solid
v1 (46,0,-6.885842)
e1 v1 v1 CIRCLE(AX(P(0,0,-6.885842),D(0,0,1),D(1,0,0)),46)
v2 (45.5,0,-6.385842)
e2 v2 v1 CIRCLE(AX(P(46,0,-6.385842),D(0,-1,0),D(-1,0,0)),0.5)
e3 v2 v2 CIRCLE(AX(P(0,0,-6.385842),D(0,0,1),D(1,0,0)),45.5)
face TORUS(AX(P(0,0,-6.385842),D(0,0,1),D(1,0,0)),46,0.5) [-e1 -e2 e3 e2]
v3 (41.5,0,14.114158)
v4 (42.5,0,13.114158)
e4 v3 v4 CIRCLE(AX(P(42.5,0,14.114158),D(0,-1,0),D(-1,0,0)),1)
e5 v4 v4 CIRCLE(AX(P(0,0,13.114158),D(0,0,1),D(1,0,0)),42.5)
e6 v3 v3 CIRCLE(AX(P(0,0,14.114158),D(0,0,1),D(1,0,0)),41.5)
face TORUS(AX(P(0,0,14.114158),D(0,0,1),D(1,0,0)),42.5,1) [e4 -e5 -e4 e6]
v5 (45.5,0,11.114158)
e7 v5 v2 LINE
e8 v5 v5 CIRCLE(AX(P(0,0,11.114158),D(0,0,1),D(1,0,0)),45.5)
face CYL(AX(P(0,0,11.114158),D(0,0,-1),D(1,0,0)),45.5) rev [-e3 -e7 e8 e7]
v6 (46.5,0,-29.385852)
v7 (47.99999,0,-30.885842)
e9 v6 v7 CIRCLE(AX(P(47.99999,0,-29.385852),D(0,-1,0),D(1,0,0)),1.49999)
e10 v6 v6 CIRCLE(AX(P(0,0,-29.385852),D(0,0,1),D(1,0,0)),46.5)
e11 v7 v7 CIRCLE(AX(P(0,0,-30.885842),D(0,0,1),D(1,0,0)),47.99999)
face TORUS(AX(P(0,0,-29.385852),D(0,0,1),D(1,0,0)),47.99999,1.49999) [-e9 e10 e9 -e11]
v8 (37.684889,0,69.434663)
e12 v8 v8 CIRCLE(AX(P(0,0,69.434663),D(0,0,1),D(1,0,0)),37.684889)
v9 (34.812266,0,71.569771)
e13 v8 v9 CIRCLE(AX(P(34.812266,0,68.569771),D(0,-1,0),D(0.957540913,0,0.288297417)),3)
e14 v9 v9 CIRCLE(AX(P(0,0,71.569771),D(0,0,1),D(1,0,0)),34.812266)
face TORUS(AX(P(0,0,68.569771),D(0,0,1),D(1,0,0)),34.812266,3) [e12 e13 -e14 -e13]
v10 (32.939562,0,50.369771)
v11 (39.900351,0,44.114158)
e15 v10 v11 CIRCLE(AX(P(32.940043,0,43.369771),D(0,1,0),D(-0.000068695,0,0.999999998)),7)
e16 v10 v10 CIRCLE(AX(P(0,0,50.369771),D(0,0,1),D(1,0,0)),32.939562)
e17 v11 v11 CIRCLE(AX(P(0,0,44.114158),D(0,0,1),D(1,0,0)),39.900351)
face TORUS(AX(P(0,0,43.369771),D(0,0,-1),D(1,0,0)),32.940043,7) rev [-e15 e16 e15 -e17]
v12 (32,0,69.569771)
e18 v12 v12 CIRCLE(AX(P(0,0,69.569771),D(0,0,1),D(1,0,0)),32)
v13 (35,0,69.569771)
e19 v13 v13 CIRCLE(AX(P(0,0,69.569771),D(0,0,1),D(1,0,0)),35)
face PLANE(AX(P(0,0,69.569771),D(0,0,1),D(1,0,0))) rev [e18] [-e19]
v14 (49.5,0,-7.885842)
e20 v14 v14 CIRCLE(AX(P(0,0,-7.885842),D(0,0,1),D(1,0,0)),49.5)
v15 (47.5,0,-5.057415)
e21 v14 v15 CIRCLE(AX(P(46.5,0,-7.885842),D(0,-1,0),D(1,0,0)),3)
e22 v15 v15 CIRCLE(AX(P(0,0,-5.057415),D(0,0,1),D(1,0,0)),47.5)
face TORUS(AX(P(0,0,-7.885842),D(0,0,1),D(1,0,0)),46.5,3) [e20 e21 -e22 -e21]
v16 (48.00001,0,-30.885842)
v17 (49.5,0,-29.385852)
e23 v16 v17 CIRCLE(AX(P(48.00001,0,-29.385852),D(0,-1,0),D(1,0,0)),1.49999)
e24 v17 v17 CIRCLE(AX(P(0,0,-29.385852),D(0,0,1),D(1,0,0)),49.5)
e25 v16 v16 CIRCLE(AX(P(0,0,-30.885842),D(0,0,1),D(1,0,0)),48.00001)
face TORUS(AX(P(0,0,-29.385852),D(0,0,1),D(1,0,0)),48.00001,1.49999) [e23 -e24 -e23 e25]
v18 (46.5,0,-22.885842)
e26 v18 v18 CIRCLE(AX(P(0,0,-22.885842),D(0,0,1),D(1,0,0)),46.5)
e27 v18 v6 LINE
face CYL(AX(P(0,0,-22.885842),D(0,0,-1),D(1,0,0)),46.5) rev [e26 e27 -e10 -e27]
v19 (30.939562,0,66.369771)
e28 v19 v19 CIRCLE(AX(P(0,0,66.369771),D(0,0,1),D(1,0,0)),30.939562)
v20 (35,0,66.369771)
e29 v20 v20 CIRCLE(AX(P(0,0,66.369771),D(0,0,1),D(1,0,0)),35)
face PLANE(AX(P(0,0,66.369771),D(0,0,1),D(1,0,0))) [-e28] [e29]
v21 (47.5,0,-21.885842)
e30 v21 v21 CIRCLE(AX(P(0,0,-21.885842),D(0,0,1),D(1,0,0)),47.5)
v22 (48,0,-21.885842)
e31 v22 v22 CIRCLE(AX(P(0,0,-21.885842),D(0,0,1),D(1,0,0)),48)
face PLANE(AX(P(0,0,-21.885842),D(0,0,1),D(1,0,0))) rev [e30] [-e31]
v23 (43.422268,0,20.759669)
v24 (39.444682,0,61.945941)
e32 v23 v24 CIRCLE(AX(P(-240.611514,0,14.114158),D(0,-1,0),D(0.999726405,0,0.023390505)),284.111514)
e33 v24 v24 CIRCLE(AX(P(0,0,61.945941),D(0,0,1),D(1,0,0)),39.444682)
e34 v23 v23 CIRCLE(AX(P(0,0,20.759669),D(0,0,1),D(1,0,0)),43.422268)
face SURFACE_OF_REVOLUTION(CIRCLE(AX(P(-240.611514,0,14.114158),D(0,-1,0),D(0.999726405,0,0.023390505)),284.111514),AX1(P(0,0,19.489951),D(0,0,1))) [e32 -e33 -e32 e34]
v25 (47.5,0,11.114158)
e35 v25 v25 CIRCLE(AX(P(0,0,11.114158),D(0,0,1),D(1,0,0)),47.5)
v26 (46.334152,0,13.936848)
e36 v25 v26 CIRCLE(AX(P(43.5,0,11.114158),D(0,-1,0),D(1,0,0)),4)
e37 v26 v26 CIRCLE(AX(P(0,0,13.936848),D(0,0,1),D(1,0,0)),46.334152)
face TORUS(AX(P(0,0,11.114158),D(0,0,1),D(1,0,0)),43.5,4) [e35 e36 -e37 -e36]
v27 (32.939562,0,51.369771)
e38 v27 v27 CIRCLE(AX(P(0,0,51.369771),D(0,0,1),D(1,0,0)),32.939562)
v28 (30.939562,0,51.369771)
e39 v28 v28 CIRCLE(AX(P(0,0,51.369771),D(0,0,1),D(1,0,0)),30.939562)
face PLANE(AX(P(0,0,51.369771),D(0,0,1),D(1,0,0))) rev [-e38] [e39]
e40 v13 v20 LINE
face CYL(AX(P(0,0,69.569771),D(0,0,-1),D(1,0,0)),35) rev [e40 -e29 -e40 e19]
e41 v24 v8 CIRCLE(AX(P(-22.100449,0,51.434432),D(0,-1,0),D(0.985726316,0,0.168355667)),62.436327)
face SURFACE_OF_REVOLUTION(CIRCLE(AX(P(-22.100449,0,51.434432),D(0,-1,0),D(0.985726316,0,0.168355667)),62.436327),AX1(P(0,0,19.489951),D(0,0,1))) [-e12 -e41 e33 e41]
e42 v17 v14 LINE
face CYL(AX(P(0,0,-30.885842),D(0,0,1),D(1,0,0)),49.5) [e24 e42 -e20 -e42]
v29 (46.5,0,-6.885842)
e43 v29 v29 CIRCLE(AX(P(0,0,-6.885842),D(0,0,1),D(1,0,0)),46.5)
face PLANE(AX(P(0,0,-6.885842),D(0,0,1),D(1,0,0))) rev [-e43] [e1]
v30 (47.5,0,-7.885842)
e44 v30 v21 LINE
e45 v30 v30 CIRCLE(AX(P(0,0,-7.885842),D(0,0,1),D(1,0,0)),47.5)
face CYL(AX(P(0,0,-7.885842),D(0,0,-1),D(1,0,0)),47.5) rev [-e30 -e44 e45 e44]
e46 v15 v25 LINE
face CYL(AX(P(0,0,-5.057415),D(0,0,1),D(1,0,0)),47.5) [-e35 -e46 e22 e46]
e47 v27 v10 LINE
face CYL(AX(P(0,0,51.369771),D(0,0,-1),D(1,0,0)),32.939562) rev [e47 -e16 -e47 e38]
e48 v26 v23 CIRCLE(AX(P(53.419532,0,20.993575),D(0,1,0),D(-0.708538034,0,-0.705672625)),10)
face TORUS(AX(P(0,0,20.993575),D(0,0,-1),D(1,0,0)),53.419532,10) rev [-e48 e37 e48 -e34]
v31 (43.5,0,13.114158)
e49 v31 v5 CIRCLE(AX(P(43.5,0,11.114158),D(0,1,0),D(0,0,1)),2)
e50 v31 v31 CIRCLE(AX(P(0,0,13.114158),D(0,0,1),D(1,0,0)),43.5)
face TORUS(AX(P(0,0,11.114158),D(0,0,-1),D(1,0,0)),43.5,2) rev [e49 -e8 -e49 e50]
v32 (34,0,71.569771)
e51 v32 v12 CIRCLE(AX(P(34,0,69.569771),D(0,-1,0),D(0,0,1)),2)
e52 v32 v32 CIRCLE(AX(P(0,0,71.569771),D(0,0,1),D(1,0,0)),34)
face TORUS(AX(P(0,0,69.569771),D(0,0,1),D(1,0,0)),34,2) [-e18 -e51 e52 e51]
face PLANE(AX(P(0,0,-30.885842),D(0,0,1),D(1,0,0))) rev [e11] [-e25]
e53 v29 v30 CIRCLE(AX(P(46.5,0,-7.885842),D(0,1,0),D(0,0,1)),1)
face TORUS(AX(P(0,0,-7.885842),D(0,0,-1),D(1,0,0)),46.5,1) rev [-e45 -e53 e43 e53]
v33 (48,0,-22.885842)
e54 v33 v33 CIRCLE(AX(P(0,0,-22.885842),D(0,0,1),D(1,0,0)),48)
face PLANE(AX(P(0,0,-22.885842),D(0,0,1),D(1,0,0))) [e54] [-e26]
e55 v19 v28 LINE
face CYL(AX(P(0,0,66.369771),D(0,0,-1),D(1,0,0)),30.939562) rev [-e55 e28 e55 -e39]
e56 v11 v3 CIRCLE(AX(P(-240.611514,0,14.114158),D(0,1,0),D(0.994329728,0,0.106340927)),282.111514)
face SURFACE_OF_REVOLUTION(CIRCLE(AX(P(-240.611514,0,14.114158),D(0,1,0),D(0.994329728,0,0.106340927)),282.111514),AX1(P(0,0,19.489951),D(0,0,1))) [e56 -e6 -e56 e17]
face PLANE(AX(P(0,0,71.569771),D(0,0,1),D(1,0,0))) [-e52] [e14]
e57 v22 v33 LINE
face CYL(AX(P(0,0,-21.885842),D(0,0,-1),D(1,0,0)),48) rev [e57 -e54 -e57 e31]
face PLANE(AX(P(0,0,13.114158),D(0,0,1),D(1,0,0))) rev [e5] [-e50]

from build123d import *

# Parameters (mm, degrees)
F2_R = 1.49999


# Not quite as in the source:
# - a fillet or chamfer is up to 0.001 mm smaller than in the source, because OpenCascade refuses the exact size


with BuildPart() as f1:
    # F0 (on Front) → F1 (revolve)
    with BuildSketch(Plane.XZ):
        with BuildLine():
            Line((47.5, -7.8858422488), (47.5, -21.8858422488))
            Line((47.5, -21.8858422488), (48, -21.8858422488))
            Line((48, -21.8858422488), (48, -22.8858422488))
            Line((48, -22.8858422488), (46.5, -22.8858422488))
            Line((46.5, -22.8858422488), (46.5, -30.8858422488))
            Line((46.5, -30.8858422488), (49.5, -30.8858422488))
            Line((49.5, -30.8858422488), (49.5, -7.8858422488))
            ThreePointArc((49.5, -7.8858422488), (48.9494897428, -6.1537914412), (47.5, -5.0574151241))
            Line((47.5, -5.0574151241), (47.5, 11.1141577512))
            ThreePointArc((47.5, 11.1141577512), (47.1970669824, 12.6411468564), (46.3341521363, 13.9368482529))
            ThreePointArc((46.3341521363, 13.9368482529), (44.2221465916, 17.0682601408), (43.4222684299, 20.7596694596))
            ThreePointArc((43.4222684299, 20.7596694596), (42.1842659663, 41.4253133381), (39.4446819312, 61.9459411631))
            ThreePointArc((39.4446819312, 61.9459411631), (38.6802297275, 65.7174308689), (37.6848888881, 69.4346634937))
            ThreePointArc((37.6848888881, 69.4346634937), (36.6018643239, 70.9775375054), (34.8122661503, 71.5697712424))
            Line((34.8122661503, 71.5697712424), (34, 71.5697712424))
            ThreePointArc((34, 71.5697712424), (32.5857864376, 70.9839848048), (32, 69.5697712424))
            Line((32, 69.5697712424), (35, 69.5697712424))
            Line((35, 69.5697712424), (35, 66.3697712424))
            Line((35, 66.3697712424), (30.9395619044, 66.3697712424))
            Line((30.9395619044, 66.3697712424), (30.9395619044, 51.3697712424))
            Line((30.9395619044, 51.3697712424), (32.9395619044, 51.3697712424))
            Line((32.9395619044, 51.3697712424), (32.9395619044, 50.3697712424))
            ThreePointArc((32.9395619044, 50.3697712424), (37.6190355898, 48.5762120979), (39.9003508649, 44.1141577512))
            ThreePointArc((39.9003508649, 44.1141577512), (41.0998038622, 29.1354665936), (41.5, 14.1141577512))
            ThreePointArc((41.5, 14.1141577512), (41.7928932188, 13.40705097), (42.5, 13.1141577512))
            Line((42.5, 13.1141577512), (43.5, 13.1141577512))
            ThreePointArc((43.5, 13.1141577512), (44.9142135624, 12.5283713136), (45.5, 11.1141577512))
            Line((45.5, 11.1141577512), (45.5, -6.3858422488))
            ThreePointArc((45.5, -6.3858422488), (45.6464466094, -6.7393956394), (46, -6.8858422488))
            Line((46, -6.8858422488), (46.5, -6.8858422488))
            ThreePointArc((46.5, -6.8858422488), (47.2071067812, -7.1787354676), (47.5, -7.8858422488))
        make_face()
    revolve(axis=Axis((0, 0, 19.4899514318), (0, 0, 1)))

    # F2 (radius 1.5 in the source; OpenCascade refuses exactly that, so slightly less here)
    f2_edges = [f1.edges().sort_by_distance(p)[0] for p in [
        (-49.5, 0, -30.885842),
        (-46.5, 0, -30.885842),
    ]]
    fillet(f2_edges, radius=F2_R)


solid = f1.part
